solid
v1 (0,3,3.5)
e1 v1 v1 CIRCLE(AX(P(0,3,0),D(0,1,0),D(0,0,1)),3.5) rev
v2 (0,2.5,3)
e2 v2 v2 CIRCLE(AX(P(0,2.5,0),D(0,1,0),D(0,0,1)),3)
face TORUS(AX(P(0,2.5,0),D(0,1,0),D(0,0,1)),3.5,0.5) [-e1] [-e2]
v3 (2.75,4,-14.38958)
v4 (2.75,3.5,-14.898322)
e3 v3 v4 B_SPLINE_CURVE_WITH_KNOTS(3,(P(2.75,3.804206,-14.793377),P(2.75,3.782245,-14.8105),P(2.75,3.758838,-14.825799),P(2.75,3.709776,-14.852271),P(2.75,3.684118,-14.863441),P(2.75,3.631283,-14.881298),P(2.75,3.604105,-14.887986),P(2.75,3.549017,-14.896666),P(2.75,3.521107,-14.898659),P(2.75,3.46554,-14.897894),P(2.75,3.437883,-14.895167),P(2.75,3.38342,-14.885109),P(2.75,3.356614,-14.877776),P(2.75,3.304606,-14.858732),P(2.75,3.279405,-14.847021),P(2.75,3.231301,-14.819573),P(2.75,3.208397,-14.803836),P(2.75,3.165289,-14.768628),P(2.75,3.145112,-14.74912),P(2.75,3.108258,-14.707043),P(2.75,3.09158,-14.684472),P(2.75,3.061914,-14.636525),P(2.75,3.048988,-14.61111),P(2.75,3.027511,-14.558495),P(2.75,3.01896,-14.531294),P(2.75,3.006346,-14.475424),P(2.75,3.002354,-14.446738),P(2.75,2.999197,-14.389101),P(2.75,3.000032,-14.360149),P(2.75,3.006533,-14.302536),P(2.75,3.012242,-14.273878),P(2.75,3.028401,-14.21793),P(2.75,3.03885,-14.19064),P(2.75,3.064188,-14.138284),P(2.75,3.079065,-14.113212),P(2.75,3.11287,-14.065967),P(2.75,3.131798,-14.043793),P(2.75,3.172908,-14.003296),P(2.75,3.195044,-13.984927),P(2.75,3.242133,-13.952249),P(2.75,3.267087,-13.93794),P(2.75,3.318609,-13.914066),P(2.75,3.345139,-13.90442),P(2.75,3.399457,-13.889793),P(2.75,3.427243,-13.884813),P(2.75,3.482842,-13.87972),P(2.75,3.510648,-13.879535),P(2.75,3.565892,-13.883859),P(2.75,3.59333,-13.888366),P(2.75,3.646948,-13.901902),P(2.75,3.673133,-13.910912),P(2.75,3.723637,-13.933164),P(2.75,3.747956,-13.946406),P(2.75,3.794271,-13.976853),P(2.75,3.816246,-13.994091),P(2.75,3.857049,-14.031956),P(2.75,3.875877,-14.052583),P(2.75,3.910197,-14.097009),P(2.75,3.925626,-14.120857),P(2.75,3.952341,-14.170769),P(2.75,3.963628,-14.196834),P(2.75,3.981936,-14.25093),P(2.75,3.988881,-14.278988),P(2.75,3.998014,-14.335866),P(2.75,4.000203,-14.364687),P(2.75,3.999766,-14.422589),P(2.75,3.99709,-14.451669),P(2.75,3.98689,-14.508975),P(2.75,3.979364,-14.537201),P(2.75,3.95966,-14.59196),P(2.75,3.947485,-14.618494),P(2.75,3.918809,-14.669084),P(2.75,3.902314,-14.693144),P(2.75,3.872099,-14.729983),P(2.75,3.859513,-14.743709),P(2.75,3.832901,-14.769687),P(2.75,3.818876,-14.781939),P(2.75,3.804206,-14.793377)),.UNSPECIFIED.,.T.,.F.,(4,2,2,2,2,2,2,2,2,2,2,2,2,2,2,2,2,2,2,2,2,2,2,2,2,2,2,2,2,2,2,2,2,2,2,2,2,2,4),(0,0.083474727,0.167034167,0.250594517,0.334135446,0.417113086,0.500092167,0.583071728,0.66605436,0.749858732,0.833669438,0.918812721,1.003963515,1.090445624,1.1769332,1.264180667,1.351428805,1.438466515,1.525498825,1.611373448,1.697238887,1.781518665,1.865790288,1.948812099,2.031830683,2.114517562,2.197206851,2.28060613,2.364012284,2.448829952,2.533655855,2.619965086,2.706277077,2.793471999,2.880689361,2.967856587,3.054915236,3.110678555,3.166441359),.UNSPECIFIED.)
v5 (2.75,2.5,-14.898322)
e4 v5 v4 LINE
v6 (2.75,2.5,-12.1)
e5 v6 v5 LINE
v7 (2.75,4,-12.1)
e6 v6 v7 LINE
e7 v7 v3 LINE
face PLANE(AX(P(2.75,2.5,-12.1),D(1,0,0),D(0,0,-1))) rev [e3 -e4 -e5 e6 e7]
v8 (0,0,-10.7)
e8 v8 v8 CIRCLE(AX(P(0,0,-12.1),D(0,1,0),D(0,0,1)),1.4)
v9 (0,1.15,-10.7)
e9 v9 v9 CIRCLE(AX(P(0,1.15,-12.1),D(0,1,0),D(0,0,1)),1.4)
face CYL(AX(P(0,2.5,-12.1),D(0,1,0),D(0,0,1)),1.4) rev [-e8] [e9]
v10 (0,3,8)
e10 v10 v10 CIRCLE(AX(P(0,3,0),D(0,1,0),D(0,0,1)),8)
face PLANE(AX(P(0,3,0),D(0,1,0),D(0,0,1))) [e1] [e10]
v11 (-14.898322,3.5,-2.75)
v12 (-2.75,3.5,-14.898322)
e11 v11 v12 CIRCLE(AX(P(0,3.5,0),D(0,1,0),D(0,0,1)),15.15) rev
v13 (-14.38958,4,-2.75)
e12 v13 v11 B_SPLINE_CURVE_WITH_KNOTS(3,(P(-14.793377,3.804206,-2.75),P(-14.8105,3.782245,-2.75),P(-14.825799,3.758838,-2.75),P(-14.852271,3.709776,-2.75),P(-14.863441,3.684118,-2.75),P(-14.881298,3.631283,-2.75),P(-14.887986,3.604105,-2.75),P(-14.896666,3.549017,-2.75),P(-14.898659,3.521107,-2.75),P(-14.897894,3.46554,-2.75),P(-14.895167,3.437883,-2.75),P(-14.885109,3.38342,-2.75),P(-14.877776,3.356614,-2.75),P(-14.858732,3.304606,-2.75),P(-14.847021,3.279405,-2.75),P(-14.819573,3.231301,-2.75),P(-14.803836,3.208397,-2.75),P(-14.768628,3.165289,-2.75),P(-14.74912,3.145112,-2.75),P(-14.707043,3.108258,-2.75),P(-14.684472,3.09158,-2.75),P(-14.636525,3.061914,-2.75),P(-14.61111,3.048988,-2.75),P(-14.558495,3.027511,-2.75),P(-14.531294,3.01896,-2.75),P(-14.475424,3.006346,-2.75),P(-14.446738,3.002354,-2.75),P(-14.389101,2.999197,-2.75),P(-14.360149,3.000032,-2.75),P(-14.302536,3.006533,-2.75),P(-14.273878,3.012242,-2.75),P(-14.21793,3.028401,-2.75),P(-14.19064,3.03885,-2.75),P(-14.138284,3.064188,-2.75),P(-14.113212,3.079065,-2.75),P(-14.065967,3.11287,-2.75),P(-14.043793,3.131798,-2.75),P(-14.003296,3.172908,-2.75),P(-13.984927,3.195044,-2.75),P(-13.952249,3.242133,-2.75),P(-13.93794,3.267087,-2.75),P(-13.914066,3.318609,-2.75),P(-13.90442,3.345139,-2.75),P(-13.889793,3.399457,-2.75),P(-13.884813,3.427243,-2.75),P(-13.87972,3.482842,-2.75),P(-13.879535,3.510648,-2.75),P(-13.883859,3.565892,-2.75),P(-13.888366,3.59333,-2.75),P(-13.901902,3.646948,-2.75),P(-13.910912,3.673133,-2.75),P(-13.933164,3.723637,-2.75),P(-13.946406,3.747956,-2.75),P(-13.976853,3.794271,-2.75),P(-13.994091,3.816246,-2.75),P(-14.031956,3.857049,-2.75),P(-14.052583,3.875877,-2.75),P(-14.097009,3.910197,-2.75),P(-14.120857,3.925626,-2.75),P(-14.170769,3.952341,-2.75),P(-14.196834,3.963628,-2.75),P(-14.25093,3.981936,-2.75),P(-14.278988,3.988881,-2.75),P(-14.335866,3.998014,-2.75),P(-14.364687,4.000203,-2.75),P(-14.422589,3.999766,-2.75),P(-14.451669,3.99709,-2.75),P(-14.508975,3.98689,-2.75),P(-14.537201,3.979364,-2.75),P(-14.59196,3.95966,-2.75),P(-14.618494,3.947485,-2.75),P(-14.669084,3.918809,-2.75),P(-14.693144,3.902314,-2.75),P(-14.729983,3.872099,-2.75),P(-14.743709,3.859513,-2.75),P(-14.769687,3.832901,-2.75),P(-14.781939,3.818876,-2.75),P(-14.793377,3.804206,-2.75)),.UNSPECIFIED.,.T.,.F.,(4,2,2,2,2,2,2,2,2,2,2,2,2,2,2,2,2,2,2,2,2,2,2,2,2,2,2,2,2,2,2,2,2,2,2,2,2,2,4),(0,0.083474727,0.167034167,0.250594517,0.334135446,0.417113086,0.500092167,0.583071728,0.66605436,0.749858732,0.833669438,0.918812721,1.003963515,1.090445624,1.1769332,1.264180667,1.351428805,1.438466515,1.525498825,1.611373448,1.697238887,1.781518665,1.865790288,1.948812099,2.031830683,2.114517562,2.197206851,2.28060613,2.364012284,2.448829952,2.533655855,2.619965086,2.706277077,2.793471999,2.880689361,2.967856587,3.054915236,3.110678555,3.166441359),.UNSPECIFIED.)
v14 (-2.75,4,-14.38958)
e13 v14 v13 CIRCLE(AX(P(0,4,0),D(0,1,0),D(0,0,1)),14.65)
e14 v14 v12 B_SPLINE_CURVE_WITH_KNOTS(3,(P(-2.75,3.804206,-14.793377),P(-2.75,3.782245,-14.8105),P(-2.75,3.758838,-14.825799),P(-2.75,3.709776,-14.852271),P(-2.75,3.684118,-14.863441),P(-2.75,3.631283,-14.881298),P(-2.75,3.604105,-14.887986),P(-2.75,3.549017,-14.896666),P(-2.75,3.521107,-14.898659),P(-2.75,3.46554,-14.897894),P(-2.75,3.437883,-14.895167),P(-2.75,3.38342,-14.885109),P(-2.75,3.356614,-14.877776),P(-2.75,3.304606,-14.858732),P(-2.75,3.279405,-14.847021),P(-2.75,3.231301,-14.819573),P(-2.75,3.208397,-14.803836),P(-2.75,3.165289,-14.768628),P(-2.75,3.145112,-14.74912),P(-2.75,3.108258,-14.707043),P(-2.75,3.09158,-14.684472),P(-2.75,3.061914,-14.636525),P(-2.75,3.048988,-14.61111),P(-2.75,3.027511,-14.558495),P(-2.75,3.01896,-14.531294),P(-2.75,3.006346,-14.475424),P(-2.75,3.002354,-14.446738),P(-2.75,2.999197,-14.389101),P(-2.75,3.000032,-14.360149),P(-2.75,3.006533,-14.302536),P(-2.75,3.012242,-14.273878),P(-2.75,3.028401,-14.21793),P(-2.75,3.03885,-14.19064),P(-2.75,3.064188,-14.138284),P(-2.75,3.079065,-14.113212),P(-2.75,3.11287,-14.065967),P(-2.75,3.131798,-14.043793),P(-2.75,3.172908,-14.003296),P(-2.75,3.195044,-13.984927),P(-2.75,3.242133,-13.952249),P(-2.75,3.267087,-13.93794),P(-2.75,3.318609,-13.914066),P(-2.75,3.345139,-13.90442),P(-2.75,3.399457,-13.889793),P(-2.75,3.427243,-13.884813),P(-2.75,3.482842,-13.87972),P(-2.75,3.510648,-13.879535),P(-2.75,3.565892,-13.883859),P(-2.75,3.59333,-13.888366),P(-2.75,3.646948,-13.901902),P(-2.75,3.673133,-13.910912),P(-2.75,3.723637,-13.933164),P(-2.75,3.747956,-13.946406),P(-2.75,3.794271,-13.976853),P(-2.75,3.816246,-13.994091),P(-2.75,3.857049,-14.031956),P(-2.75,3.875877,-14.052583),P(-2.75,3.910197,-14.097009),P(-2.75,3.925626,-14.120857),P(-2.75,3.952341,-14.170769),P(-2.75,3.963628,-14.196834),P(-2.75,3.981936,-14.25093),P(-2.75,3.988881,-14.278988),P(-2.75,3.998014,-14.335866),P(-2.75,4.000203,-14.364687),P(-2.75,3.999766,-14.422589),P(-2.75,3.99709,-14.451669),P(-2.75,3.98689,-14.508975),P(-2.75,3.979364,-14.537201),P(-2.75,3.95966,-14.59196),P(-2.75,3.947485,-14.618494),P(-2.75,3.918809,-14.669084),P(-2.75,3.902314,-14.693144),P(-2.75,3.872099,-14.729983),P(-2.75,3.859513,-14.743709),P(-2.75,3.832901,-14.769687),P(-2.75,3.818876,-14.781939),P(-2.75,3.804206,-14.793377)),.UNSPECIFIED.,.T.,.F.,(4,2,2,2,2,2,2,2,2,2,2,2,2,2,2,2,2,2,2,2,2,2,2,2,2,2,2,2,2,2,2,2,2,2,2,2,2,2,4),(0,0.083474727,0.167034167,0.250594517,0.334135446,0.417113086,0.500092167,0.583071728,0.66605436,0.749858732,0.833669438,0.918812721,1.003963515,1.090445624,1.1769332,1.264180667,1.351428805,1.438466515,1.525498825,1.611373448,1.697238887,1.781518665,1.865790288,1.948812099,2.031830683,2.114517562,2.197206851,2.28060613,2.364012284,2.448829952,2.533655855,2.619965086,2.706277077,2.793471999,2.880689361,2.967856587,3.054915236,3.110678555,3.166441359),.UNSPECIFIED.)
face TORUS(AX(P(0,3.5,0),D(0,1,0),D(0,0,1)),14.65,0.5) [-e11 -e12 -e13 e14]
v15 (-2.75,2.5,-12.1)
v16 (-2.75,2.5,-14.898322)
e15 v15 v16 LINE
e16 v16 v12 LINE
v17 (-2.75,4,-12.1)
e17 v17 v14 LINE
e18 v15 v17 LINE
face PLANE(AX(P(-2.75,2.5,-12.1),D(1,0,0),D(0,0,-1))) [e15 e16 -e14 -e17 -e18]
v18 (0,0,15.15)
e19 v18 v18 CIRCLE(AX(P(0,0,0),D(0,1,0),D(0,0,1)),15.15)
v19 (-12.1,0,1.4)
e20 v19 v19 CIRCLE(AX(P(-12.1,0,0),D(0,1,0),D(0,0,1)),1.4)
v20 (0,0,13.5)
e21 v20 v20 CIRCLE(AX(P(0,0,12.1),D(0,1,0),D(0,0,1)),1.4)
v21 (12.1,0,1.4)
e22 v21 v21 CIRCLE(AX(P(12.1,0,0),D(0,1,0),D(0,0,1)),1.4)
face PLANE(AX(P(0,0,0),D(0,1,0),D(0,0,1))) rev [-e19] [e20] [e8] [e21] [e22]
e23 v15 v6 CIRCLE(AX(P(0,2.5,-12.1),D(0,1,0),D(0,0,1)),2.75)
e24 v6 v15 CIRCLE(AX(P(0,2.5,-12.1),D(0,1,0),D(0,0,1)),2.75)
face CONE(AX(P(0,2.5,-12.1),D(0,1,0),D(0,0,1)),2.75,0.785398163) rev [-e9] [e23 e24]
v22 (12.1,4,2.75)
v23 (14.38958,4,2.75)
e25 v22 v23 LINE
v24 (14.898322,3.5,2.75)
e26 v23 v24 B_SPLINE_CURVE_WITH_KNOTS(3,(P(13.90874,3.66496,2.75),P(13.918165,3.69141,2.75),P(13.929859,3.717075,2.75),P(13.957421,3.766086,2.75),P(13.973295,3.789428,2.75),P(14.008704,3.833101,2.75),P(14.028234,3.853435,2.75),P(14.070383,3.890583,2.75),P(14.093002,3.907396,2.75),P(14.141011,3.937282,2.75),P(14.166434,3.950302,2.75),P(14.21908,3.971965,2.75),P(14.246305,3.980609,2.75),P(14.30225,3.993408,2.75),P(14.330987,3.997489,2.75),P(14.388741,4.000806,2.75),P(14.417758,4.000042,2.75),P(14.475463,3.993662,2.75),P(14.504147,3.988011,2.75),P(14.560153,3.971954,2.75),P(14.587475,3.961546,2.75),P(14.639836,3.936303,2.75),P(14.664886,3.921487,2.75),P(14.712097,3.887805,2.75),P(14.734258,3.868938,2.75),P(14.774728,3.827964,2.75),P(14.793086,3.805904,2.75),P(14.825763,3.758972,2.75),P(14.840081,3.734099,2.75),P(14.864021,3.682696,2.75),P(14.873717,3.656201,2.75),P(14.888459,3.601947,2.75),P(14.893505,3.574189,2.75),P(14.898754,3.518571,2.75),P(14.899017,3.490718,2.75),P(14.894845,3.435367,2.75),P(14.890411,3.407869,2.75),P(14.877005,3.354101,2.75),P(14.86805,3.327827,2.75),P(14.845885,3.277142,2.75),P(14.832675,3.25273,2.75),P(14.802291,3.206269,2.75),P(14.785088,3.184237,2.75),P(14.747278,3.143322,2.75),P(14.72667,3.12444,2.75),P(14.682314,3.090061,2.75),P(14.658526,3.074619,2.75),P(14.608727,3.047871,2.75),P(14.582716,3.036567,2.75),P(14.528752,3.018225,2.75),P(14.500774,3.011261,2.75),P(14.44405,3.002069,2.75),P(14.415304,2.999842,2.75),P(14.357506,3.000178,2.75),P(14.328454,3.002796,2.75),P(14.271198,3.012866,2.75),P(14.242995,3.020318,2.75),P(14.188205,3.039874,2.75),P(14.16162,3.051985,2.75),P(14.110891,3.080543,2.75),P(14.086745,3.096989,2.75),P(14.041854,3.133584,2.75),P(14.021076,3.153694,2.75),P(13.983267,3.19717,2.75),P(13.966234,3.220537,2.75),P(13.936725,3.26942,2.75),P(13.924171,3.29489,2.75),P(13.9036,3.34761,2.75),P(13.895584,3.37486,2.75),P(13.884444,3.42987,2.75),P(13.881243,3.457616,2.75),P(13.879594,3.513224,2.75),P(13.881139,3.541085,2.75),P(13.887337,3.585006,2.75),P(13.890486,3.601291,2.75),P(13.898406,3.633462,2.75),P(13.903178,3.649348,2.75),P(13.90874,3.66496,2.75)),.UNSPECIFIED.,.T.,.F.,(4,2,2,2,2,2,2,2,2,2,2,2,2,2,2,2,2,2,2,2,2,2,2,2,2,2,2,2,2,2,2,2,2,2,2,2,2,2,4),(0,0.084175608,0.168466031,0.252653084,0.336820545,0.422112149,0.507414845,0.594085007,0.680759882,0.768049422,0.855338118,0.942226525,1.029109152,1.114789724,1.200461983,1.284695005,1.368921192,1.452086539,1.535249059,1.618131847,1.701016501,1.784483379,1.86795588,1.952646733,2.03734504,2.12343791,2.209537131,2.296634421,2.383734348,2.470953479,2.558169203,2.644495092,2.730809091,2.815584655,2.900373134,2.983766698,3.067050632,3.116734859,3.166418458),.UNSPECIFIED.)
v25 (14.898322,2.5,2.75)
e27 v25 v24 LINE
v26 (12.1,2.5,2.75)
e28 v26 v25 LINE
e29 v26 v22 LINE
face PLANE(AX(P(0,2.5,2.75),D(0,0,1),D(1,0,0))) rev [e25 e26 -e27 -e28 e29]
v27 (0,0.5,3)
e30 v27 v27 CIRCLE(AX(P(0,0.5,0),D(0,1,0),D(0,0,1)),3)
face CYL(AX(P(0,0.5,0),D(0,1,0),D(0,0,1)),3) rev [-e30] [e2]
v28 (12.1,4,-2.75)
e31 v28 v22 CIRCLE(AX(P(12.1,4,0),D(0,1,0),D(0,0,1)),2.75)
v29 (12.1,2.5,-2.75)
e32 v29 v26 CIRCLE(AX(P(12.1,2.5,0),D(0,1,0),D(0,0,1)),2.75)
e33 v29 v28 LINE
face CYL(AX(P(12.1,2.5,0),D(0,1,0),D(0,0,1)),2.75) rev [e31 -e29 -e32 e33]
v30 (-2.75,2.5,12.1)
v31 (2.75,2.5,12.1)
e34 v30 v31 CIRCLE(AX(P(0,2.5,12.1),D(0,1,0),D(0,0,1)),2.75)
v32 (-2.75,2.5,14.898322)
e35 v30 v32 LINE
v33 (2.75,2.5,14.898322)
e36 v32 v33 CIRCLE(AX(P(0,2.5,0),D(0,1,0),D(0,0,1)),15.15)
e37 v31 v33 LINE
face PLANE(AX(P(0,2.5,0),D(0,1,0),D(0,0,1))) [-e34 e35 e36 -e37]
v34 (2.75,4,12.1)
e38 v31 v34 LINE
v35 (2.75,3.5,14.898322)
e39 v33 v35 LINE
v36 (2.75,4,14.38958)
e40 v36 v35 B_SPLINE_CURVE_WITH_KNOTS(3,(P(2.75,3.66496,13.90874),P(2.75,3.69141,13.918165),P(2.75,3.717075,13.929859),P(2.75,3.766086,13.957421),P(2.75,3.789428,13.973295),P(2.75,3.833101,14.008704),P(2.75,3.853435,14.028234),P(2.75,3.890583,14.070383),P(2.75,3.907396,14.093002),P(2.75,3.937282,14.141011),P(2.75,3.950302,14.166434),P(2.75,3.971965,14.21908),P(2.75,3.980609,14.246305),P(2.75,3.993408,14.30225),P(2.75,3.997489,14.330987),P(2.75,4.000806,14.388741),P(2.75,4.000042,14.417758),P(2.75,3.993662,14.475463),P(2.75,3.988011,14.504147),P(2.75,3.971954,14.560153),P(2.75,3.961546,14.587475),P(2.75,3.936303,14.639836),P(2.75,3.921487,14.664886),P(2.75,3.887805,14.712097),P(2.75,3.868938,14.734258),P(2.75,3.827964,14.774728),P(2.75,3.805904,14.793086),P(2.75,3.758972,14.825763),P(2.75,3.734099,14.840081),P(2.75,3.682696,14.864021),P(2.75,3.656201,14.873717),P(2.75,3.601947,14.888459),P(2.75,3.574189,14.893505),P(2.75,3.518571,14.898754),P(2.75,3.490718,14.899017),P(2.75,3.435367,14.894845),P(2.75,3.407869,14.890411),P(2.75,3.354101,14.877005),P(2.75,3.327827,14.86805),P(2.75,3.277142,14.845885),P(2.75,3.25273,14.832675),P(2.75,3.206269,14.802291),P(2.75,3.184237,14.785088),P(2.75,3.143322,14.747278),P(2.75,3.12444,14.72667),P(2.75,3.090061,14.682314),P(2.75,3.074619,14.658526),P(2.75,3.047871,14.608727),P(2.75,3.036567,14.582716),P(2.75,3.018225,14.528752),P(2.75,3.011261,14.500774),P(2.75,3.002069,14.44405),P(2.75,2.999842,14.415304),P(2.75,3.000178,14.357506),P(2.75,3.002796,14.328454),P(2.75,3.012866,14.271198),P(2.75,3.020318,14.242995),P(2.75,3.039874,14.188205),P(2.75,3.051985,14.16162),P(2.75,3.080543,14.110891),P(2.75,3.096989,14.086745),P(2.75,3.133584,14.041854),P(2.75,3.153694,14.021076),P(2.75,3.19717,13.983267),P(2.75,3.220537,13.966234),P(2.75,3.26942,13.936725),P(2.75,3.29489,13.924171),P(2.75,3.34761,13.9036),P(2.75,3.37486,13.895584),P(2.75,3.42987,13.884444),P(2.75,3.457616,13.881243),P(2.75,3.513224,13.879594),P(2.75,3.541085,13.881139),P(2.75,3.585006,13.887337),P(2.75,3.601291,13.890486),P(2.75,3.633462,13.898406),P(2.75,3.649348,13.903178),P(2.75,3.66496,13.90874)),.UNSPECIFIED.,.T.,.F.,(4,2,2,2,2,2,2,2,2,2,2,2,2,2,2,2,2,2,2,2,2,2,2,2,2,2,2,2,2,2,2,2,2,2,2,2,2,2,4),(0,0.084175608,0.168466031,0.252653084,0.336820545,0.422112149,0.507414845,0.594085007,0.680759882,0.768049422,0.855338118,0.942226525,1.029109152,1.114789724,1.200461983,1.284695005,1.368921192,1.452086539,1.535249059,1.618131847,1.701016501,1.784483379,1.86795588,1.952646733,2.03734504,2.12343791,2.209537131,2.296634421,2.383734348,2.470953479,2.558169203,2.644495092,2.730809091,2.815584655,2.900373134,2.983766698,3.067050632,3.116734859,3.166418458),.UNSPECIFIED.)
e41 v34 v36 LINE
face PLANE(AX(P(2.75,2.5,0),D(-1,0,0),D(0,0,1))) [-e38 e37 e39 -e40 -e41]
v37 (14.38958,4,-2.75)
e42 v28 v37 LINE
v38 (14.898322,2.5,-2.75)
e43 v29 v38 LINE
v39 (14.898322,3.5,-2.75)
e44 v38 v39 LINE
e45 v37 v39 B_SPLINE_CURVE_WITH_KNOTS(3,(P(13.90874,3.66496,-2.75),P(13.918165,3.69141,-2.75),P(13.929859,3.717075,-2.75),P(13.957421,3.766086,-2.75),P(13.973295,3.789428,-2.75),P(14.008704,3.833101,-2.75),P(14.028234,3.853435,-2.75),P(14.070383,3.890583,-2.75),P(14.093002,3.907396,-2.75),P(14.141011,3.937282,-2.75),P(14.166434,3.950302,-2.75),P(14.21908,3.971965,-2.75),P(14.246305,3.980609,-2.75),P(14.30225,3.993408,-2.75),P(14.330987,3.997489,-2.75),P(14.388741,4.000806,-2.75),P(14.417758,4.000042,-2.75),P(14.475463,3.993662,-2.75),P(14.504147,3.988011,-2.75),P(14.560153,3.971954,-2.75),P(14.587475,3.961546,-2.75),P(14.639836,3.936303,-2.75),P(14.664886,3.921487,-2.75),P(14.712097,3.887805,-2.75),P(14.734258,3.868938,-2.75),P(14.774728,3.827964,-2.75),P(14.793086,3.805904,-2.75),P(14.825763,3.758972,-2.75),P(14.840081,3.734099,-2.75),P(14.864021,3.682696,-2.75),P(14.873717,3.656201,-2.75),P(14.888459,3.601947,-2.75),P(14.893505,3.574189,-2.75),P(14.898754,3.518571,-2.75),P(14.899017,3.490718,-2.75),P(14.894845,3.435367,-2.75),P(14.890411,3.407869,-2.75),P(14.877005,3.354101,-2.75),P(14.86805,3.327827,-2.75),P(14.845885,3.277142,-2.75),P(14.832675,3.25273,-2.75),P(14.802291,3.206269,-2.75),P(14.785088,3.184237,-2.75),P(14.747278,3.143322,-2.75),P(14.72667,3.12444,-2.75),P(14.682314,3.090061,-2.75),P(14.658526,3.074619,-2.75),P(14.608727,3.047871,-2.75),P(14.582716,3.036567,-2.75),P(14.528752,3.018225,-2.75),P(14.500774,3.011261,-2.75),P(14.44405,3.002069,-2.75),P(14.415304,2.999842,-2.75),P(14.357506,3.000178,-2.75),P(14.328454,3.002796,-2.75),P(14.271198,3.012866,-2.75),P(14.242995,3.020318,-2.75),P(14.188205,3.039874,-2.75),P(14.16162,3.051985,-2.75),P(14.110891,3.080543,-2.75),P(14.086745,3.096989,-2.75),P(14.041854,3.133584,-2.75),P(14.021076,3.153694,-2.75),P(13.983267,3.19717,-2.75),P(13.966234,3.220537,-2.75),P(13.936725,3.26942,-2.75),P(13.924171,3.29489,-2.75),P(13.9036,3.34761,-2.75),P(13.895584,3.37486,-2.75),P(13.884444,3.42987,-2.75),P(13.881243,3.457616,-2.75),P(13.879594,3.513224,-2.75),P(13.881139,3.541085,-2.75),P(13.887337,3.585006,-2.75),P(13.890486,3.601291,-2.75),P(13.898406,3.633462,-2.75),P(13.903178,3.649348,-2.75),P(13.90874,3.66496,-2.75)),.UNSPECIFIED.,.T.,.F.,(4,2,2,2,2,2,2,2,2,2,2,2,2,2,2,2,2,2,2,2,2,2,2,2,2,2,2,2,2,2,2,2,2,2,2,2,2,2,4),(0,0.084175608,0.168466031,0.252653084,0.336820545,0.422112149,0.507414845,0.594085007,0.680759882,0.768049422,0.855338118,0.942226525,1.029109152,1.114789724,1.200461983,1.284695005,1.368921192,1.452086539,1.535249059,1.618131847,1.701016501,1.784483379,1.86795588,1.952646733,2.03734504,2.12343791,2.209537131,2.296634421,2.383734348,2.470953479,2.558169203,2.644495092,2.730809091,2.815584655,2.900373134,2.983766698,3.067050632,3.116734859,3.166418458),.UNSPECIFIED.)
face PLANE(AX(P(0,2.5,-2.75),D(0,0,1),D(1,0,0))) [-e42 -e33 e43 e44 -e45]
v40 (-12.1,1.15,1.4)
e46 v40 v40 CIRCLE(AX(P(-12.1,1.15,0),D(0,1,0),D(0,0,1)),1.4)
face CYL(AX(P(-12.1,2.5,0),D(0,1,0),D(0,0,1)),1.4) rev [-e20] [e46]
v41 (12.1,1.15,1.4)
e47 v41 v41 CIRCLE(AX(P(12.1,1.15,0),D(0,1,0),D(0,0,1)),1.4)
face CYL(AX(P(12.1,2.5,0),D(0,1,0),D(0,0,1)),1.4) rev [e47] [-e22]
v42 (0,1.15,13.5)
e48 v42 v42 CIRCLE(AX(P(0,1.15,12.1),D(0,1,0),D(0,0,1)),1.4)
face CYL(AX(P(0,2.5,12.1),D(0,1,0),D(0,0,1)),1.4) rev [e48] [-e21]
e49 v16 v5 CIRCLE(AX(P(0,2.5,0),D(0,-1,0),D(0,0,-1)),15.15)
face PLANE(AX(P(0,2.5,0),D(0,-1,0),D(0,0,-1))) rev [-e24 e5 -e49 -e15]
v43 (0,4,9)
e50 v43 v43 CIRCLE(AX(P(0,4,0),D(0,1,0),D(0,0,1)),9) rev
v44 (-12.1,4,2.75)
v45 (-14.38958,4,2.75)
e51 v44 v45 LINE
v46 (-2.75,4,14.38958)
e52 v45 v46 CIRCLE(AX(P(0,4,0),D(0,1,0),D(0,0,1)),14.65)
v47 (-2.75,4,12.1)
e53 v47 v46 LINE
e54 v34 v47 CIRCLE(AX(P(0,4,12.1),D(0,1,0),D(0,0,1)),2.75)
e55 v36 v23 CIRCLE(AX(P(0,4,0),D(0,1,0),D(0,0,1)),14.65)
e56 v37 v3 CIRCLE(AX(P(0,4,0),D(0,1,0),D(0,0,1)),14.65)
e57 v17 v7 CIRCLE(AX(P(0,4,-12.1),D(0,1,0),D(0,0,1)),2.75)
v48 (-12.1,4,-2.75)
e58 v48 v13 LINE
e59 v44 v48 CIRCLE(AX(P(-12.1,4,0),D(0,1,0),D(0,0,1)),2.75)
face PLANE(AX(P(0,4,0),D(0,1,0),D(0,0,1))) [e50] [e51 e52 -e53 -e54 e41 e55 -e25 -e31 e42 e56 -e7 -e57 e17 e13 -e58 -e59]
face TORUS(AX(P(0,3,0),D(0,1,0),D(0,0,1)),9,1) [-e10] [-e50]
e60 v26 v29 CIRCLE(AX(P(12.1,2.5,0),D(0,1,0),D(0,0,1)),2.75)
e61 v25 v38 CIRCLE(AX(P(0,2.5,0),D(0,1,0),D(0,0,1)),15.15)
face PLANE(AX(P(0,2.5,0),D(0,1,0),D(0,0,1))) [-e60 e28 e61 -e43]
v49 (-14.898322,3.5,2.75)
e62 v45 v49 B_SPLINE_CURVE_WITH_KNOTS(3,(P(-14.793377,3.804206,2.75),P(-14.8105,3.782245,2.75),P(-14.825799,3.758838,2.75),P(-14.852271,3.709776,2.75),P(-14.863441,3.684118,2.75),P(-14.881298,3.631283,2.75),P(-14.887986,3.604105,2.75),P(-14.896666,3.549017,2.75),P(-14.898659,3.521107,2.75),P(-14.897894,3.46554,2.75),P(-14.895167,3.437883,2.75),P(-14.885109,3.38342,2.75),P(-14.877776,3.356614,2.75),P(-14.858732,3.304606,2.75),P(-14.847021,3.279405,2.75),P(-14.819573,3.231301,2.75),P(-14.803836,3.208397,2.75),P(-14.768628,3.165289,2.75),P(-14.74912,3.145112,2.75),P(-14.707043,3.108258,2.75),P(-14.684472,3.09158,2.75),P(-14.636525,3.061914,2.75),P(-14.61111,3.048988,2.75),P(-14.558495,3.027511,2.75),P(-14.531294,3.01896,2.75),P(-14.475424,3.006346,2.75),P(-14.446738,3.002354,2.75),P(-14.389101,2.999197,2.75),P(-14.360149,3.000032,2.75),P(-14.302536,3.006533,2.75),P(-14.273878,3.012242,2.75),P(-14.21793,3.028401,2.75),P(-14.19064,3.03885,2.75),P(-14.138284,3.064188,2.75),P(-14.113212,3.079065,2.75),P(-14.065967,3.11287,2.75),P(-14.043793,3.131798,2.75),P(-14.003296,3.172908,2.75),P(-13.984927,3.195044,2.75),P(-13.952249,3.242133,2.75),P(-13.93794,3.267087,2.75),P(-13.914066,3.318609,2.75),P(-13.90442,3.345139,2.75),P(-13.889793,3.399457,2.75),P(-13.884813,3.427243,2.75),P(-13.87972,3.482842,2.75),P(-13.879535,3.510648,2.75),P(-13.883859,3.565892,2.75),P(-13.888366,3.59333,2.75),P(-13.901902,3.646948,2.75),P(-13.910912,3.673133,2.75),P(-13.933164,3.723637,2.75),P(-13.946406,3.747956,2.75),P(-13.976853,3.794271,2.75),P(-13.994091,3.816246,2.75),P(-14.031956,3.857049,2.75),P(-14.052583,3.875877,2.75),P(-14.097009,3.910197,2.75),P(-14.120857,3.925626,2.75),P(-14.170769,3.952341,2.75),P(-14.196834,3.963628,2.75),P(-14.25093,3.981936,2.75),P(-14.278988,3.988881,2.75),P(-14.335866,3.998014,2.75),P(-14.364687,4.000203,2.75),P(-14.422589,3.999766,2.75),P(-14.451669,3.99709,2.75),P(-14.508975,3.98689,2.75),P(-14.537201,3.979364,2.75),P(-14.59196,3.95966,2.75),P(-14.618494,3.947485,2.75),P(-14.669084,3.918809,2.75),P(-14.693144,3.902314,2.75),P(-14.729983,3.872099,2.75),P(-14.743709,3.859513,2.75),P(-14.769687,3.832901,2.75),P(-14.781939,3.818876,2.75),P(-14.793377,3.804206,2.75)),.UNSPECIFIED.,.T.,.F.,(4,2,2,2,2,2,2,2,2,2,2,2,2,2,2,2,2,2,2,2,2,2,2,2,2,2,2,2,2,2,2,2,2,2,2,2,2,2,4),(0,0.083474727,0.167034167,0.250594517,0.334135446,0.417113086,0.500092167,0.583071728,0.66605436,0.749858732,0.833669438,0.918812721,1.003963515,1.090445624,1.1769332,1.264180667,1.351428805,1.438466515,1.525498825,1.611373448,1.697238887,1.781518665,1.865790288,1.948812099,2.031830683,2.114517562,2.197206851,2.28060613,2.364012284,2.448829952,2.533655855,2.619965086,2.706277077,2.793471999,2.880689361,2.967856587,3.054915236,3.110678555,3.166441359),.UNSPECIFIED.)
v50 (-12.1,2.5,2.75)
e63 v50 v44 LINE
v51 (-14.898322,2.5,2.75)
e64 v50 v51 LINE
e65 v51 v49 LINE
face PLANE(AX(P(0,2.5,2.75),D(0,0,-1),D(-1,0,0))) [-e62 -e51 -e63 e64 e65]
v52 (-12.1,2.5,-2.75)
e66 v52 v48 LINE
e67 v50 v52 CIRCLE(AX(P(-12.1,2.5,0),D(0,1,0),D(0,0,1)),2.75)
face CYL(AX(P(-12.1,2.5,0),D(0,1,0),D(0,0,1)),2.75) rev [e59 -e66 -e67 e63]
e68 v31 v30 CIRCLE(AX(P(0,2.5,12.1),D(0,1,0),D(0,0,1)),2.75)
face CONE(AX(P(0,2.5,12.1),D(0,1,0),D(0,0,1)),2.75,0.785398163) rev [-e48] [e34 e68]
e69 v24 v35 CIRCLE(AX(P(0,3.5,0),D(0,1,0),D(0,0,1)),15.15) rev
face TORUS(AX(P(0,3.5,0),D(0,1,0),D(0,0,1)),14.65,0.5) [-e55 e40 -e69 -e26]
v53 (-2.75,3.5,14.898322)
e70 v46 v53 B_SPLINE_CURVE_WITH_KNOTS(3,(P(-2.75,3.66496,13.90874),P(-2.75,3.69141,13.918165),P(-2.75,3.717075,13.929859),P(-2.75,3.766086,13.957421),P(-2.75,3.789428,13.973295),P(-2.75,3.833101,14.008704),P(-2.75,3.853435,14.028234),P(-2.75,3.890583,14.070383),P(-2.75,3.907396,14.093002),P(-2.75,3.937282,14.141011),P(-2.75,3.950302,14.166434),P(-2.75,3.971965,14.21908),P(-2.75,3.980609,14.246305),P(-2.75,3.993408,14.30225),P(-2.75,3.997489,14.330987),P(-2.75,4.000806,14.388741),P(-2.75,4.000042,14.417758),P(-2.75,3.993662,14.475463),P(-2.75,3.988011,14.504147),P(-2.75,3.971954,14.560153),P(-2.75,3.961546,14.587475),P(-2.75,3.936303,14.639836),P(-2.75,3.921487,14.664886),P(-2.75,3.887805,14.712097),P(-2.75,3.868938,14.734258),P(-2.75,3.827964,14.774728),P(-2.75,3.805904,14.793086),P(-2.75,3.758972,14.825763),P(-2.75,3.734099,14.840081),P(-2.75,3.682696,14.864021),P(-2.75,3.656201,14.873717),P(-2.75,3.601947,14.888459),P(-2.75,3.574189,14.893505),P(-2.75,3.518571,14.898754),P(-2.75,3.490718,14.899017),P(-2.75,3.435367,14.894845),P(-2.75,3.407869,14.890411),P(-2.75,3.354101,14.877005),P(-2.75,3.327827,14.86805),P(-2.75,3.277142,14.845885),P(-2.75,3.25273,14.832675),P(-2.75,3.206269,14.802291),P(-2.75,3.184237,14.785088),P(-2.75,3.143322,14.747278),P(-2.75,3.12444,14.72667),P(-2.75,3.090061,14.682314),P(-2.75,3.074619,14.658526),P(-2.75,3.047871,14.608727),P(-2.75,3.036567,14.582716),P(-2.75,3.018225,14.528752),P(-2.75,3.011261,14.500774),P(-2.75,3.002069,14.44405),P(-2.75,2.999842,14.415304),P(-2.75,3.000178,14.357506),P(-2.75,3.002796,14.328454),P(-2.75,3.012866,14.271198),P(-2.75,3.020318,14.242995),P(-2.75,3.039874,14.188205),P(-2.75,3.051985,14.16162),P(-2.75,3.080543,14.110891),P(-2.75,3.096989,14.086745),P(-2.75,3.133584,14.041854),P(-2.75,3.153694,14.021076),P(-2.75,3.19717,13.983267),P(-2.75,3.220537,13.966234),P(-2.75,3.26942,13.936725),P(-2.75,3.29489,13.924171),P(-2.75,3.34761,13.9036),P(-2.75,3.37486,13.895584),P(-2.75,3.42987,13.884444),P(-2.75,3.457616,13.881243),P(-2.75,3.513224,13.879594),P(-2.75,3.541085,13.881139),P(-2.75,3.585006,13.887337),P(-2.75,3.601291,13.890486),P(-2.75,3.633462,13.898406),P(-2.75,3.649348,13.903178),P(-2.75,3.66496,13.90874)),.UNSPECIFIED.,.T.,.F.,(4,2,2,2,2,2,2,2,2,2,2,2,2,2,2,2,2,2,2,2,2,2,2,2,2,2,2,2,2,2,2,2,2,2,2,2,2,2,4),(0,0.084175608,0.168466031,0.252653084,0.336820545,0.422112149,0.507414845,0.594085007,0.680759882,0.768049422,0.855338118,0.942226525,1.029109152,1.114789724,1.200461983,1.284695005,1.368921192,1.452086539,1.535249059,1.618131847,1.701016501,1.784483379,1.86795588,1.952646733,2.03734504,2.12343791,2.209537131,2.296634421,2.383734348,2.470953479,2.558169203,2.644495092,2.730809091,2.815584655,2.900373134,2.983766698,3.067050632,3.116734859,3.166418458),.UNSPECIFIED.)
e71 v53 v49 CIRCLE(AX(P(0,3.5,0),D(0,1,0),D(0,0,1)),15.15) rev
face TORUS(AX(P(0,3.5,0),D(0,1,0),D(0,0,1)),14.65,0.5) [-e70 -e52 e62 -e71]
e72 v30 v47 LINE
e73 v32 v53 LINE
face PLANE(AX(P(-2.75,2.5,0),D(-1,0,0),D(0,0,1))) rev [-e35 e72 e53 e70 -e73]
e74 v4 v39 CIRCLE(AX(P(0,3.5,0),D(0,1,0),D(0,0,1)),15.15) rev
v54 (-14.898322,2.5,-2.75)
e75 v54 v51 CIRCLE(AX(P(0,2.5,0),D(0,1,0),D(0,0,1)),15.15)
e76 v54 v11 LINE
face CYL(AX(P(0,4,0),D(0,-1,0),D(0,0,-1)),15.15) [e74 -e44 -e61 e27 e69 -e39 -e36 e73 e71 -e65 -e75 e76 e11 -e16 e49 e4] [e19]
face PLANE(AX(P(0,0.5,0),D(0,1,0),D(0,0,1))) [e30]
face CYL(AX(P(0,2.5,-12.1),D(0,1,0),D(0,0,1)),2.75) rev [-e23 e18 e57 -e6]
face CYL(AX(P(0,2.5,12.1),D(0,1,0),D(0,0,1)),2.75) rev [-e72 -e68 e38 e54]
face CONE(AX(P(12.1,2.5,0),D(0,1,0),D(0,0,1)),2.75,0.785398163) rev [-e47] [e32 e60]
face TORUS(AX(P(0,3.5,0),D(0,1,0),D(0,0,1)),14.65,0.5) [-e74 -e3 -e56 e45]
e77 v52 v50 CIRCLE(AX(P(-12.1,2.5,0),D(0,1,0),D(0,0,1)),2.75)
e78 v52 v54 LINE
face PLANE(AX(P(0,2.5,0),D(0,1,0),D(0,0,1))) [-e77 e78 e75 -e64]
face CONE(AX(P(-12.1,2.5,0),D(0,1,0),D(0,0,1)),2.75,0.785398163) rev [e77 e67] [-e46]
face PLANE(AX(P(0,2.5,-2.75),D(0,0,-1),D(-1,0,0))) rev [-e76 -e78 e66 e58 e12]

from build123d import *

# Parameters (mm, degrees)
SKETCH1_R                                      = 15.15
BOSS_EXTRUDE1_DEPTH                            = 4
SKETCH4_R                                      = 8
CUT_EXTRUDE3_DEPTH                             = 1
SKETCH5_R                                      = 3
CUT_EXTRUDE4_DEPTH                             = 2.5
FILLET1_R                                      = 1
FILLET2_R                                      = 0.5
FILLET3_R                                      = 0.5
CUT_EXTRUDE5_START                             = -1.5
CUT_EXTRUDE5_DEPTH                             = 1.5
CSK_FOR_M2_5_FLAT_HEAD_MACHINE_SCREW1_AT_COUNT = 2
CSK_FOR_M2_5_FLAT_HEAD_MACHINE_SCREW1_AT_PITCH = 17.111984105
CSK_FOR_M2_5_FLAT_HEAD_MACHINE_SCREW_2_COUNT   = 2
CSK_FOR_M2_5_FLAT_HEAD_MACHINE_SCREW_2_PITCH   = 17.111984105
CSK_FOR_M2_5_FLAT_HEAD_MACHINE_SCREW_3_COUNT   = 2
CSK_FOR_M2_5_FLAT_HEAD_MACHINE_SCREW_3_PITCH   = 24.2


with BuildPart() as part:
    # Sketch1 → Boss-Extrude1 (new body)
    with BuildSketch(Plane(origin=(0, 0, 0), x_dir=(1, 0, 0), z_dir=(0, 1, 0))):
        with Locations(Location((0, 0, 0), (0, 0, 270))):
            Circle(SKETCH1_R)
    extrude(amount=BOSS_EXTRUDE1_DEPTH)

    # Sketch4 → Cut-Extrude3 (cut)
    with BuildSketch(Plane(origin=(0, 4, 0), x_dir=(1, 0, 0), z_dir=(0, 1, 0))):
        with Locations(Location((0, 0, 0), (0, 0, 270))):
            Circle(SKETCH4_R)
    extrude(amount=-CUT_EXTRUDE3_DEPTH, mode=Mode.SUBTRACT)

    # Sketch5 → Cut-Extrude4 (cut)
    with BuildSketch(Plane(origin=(0, 3, 0), x_dir=(1, 0, 0), z_dir=(0, 1, 0))):
        with Locations(Location((0, 0, 0), (0, 0, 270))):
            Circle(SKETCH5_R)
    extrude(amount=-CUT_EXTRUDE4_DEPTH, mode=Mode.SUBTRACT)

    # Fillet1
    fillet1_edges = [part.edges().sort_by_distance(p)[0] for p in [
        (0, 4, -8),
    ]]
    fillet(fillet1_edges, radius=FILLET1_R - 0.0001)  # a hair under: the kernel refuses the full size

    # Fillet2
    fillet2_edges = [part.edges().sort_by_distance(p)[0] for p in [
        (0, 3, -3),
    ]]
    fillet(fillet2_edges, radius=FILLET2_R)

    # Fillet3
    fillet3_edges = [part.edges().sort_by_distance(p)[0] for p in [
        (0, 4, -15.15),
    ]]
    fillet(fillet3_edges, radius=FILLET3_R)

    # Sketch2<2> → Cut-Extrude5 (cut)
    with BuildSketch(Plane(origin=(0, 4, 0), x_dir=(1, 0, 0), z_dir=(0, 1, 0)).offset(CUT_EXTRUDE5_START)):
        with BuildLine():
            Line((-12.1, 2.75), (-14.898322053, 2.75))
            ThreePointArc((-14.898322053, 2.75), (-15.15, 0), (-14.898322053, -2.75))
            Line((-14.898322053, -2.75), (-12.1, -2.75))
            ThreePointArc((-12.1, -2.75), (-9.35, 0), (-12.1, 2.75))
        make_face()
        with BuildLine():
            Line((-2.75, -12.1), (-2.75, -14.898322053))
            ThreePointArc((-2.75, -14.898322053), (0, -15.15), (2.75, -14.898322053))
            Line((2.75, -14.898322053), (2.75, -12.1))
            ThreePointArc((2.75, -12.1), (0, -9.35), (-2.75, -12.1))
        make_face()
        with BuildLine():
            ThreePointArc((15.15, 0), (15.086949312, 1.380746337), (14.898322053, 2.75))
            Line((14.898322053, 2.75), (12.1, 2.75))
            ThreePointArc((12.1, 2.75), (9.35, 0), (12.1, -2.75))
            Line((12.1, -2.75), (14.898322053, -2.75))
            ThreePointArc((14.898322053, -2.75), (15.086949312, -1.380746337), (15.15, 0))
        make_face()
        with BuildLine():
            ThreePointArc((-2.75, 12.1), (0, 9.35), (2.75, 12.1))
            Line((2.75, 12.1), (2.75, 14.898322053))
            ThreePointArc((2.75, 14.898322053), (0, 15.15), (-2.75, 14.898322053))
            Line((-2.75, 14.898322053), (-2.75, 12.1))
        make_face()
    extrude(amount=CUT_EXTRUDE5_DEPTH, mode=Mode.SUBTRACT)

    # Sketch7 → CSK for M2.5 Flat Head Machine Screw1 (revolve, cut)
    with BuildSketch(Plane(origin=(0, 2.5, -12.1), x_dir=(0, 0, 1), z_dir=(1, 0, 0))):
        Polygon((0, 0), (0, 2.5), (1.4, 2.5), (1.4, 1.35), (2.75, 0), align=None)
    csk_for_m2_5_flat_head_machine_screw1 = revolve(axis=Axis((0, 8.85, -12.1), (0, -1, 0)), mode=Mode.SUBTRACT)

    # CSK for M2.5 Flat Head Machine Screw1 at: CSK for M2.5 Flat Head Machine Screw1 ×2
    with Locations(*[Vector(-0.7071067811865512, 0, 0.7071067811865439) * (i * CSK_FOR_M2_5_FLAT_HEAD_MACHINE_SCREW1_AT_PITCH) for i in range(1, CSK_FOR_M2_5_FLAT_HEAD_MACHINE_SCREW1_AT_COUNT)]):
        add(csk_for_m2_5_flat_head_machine_screw1, mode=Mode.SUBTRACT)

    # CSK for M2.5 Flat Head Machine Screw 2: CSK for M2.5 Flat Head Machine Screw1 ×2
    with Locations(*[Vector(0.7071067811865464, 0, 0.7071067811865488) * (i * CSK_FOR_M2_5_FLAT_HEAD_MACHINE_SCREW_2_PITCH) for i in range(1, CSK_FOR_M2_5_FLAT_HEAD_MACHINE_SCREW_2_COUNT)]):
        add(csk_for_m2_5_flat_head_machine_screw1, mode=Mode.SUBTRACT)

    # CSK for M2.5 Flat Head Machine Screw 3: CSK for M2.5 Flat Head Machine Screw1 ×2
    with Locations(*[(0, 0, i * CSK_FOR_M2_5_FLAT_HEAD_MACHINE_SCREW_3_PITCH) for i in range(1, CSK_FOR_M2_5_FLAT_HEAD_MACHINE_SCREW_3_COUNT)]):
        add(csk_for_m2_5_flat_head_machine_screw1, mode=Mode.SUBTRACT)


solid = part.part
